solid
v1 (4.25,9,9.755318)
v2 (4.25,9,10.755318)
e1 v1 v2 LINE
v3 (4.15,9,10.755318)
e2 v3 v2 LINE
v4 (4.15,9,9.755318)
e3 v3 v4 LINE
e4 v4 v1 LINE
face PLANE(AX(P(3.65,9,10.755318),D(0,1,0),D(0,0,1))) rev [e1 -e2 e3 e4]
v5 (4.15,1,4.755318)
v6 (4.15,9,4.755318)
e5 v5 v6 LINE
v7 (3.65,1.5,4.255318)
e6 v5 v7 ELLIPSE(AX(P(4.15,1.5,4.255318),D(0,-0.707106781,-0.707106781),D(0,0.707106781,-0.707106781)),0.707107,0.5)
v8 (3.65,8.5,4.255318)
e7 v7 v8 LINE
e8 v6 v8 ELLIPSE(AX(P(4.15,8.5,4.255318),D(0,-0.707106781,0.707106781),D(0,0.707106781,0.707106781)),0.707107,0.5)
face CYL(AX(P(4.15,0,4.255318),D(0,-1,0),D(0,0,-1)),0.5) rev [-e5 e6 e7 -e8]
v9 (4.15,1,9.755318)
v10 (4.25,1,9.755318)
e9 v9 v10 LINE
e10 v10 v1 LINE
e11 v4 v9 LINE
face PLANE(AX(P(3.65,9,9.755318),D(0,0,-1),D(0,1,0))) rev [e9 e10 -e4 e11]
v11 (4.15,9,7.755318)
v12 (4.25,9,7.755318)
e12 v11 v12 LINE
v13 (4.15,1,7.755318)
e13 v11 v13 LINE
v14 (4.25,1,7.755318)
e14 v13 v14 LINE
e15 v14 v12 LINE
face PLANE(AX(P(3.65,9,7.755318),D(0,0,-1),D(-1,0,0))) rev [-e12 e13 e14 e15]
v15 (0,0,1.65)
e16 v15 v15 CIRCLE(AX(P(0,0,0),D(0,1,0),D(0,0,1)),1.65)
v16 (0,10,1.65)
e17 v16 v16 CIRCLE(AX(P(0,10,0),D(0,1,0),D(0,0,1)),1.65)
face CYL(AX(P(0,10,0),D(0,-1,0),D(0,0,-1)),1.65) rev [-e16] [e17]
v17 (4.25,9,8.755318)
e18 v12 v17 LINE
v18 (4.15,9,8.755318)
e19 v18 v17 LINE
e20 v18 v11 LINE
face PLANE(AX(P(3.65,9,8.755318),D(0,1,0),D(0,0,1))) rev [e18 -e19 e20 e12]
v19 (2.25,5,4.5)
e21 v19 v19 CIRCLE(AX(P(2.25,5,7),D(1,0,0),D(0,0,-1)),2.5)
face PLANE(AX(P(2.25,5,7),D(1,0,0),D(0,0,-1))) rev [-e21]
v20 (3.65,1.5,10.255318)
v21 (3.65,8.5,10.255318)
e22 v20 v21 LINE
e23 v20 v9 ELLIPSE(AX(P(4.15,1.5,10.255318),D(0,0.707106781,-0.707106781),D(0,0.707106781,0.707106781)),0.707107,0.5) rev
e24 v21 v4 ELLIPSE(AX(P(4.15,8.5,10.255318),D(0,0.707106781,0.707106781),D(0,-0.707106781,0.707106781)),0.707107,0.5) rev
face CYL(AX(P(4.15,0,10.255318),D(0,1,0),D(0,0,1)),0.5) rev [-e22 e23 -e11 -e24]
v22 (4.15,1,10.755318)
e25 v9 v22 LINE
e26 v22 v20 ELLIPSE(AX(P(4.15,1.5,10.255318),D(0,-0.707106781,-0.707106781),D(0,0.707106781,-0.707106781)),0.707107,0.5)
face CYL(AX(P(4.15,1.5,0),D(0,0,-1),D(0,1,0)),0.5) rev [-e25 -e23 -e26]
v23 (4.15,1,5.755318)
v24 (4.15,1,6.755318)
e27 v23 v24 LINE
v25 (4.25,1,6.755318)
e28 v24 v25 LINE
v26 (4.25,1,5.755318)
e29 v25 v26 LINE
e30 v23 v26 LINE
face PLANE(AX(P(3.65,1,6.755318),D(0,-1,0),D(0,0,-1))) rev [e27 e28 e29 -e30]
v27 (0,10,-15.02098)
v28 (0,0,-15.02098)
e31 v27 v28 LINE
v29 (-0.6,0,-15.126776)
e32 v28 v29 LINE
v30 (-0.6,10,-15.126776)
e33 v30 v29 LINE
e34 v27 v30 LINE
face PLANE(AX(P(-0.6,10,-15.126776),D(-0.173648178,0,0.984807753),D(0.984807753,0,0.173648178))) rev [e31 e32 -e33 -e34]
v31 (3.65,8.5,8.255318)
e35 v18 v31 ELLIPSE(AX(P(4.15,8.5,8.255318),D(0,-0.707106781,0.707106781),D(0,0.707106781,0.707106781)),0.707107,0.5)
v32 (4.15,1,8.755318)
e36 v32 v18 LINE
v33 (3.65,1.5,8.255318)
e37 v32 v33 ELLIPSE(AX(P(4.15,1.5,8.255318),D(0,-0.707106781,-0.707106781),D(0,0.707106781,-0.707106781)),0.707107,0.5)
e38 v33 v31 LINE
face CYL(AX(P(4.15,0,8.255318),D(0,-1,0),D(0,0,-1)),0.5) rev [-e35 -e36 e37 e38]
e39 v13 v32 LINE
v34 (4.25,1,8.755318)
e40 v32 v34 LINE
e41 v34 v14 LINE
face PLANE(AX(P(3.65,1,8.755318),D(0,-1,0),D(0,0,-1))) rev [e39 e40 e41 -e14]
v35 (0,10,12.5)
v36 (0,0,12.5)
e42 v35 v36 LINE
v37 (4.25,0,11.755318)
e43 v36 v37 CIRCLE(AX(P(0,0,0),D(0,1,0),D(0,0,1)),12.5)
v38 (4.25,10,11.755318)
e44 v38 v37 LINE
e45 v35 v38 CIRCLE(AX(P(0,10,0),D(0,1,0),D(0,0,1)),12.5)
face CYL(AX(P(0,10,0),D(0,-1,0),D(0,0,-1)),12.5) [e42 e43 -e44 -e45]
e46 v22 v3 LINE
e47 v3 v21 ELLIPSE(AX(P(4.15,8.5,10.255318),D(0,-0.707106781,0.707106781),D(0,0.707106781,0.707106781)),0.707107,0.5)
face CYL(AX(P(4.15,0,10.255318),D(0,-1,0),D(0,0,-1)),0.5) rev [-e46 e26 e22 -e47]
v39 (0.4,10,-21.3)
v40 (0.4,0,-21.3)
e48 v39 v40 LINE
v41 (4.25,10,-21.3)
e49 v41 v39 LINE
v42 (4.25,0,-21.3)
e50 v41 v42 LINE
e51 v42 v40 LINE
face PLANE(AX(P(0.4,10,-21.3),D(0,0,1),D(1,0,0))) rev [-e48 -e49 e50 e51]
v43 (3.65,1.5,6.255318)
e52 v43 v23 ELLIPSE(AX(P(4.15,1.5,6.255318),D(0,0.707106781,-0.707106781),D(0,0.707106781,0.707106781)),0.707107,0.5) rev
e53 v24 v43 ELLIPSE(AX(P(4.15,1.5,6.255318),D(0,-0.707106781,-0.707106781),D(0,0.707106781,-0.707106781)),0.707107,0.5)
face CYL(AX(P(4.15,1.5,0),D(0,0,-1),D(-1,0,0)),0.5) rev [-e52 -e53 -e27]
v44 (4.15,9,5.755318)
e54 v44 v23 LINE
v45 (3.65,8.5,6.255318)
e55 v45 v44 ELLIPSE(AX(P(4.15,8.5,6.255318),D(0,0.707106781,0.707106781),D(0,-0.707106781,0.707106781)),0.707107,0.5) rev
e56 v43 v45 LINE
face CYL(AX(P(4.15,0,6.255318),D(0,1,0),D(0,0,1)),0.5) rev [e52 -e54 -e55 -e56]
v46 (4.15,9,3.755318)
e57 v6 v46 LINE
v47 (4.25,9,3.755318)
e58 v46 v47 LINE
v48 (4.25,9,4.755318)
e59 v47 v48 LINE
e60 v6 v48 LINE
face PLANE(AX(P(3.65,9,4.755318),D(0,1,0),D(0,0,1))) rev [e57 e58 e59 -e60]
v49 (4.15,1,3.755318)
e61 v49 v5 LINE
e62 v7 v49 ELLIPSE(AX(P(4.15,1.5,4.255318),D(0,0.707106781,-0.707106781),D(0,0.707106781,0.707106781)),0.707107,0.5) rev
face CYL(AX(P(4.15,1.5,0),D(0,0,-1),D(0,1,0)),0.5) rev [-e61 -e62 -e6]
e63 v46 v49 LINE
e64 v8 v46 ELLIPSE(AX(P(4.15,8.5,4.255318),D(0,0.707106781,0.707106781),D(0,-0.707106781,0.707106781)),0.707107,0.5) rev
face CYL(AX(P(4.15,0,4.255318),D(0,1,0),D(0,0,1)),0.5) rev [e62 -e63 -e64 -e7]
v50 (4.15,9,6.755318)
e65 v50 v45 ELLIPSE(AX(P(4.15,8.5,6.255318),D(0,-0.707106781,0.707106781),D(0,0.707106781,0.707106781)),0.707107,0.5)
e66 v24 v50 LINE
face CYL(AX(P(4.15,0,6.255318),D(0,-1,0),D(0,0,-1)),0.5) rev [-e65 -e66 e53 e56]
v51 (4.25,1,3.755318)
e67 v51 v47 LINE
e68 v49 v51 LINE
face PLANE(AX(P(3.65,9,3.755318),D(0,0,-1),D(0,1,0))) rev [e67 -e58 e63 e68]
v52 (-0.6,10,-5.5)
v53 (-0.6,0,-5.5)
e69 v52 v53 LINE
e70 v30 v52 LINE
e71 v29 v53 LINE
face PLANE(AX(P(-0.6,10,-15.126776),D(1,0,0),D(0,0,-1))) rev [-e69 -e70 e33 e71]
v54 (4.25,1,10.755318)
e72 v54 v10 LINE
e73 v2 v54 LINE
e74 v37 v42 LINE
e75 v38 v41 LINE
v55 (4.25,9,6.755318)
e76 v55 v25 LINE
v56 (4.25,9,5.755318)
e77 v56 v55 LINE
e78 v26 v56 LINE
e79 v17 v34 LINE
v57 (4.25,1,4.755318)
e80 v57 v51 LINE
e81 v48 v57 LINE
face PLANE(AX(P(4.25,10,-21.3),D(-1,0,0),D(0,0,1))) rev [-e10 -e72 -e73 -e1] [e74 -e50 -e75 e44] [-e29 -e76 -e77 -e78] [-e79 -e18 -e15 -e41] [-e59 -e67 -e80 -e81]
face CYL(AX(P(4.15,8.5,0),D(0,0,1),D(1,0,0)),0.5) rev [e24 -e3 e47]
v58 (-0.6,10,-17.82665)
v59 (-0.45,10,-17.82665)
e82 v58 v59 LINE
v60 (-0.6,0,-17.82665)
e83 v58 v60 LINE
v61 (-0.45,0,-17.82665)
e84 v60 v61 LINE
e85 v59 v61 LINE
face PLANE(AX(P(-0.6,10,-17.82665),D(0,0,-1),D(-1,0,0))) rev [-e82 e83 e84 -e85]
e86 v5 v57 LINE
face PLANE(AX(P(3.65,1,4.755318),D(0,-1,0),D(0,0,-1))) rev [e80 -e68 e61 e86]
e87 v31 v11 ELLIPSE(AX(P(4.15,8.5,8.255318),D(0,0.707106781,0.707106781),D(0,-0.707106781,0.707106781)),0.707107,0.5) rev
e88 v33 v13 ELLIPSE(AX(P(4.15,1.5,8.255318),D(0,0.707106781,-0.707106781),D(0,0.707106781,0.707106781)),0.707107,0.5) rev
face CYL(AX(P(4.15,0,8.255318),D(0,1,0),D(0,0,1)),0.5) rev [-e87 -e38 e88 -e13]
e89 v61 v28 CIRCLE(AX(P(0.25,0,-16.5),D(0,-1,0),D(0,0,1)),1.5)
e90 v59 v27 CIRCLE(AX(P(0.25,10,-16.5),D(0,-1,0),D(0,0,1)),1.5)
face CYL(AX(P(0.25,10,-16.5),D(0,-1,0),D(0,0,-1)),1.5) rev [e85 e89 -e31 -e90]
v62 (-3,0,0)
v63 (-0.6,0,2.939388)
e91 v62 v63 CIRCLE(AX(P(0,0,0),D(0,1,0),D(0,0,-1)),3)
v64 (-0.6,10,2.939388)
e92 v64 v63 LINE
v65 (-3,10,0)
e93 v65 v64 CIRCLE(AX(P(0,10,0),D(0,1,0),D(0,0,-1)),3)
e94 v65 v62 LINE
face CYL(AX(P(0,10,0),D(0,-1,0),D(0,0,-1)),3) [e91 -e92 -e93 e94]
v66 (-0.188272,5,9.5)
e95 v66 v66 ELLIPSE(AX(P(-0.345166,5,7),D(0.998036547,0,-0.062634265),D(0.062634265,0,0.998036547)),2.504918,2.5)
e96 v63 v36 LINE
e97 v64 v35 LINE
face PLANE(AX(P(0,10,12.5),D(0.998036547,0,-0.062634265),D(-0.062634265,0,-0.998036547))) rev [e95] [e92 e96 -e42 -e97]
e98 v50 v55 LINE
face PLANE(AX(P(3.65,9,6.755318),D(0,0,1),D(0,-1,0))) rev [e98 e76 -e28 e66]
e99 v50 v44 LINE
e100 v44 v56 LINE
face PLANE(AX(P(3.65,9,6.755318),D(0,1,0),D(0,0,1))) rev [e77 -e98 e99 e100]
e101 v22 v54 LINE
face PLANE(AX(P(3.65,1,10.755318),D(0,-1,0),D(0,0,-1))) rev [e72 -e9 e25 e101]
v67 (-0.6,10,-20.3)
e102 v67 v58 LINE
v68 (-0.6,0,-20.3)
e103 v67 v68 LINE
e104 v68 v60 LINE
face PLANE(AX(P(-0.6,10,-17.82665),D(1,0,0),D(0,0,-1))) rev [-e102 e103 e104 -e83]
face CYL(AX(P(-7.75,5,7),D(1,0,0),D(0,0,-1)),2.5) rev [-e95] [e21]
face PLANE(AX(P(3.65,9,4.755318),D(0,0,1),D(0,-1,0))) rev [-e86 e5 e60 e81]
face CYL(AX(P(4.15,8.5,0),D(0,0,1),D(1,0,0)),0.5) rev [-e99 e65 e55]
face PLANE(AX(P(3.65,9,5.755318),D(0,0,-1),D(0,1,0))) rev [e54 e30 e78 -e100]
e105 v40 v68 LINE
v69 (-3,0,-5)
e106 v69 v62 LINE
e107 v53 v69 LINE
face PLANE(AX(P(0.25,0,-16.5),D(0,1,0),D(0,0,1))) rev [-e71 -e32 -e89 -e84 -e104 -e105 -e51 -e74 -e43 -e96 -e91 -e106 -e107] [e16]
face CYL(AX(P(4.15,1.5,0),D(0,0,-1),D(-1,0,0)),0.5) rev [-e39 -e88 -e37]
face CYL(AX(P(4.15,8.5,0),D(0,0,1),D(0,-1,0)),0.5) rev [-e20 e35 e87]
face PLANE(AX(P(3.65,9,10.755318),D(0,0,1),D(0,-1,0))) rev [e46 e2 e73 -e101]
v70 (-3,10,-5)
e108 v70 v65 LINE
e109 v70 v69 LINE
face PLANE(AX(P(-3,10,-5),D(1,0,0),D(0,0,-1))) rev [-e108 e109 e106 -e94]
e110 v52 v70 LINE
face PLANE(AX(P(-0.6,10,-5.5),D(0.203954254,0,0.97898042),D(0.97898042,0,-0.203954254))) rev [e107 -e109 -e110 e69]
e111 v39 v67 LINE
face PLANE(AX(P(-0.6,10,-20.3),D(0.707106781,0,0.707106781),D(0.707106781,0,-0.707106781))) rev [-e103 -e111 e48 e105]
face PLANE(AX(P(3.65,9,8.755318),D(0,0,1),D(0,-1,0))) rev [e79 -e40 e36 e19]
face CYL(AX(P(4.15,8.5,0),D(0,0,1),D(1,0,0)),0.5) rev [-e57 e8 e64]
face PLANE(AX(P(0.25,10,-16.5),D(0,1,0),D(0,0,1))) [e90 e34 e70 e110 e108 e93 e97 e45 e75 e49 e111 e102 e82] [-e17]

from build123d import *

# Parameters (mm, degrees)
SKETCH1_R           = 1.65
BOSS_EXTRUDE1_DEPTH = 10
CUT_EXTRUDE1_START  = -2
SKETCH2_R           = 2.5
CUT_EXTRUDE1_DEPTH  = 10
SKETCH3_W           = 1
SKETCH3_H           = 8
CUT_EXTRUDE2_DEPTH  = 0.6
FILLET1_R           = 0.5


with BuildPart() as part:
    # Sketch1 → Boss-Extrude1 (new body)
    with BuildSketch(Plane(origin=(0, 0, 0), x_dir=(1, 0, 0), z_dir=(0, 1, 0))):
        with BuildLine():
            Line((4.25, 21.3), (4.25, -11.755317946))
            ThreePointArc((4.25, -11.755317946), (2.157374061, -12.312422067), (0, -12.5))
            Line((0, -12.5), (-0.6, -2.939387691))
            ThreePointArc((-0.6, -2.939387691), (-2.323790008, -1.897366596), (-3, 0))
            Line((-3, 0), (-3, 5))
            Line((-3, 5), (-0.6, 5.5))
            Line((-0.6, 5.5), (-0.6, 15.126776243))
            Line((-0.6, 15.126776243), (0, 15.020980054))
            ThreePointArc((0, 15.020980054), (1.731070844, 16.737548219), (-0.45, 17.826649916))
            Line((-0.45, 17.826649916), (-0.6, 17.826649916))
            Line((-0.6, 17.826649916), (-0.6, 20.3))
            Line((-0.6, 20.3), (0.4, 21.3))
            Line((0.4, 21.3), (4.25, 21.3))
        make_face()
        with Locations(Location((0, 0, 0), (0, 0, 270))):
            Circle(SKETCH1_R, mode=Mode.SUBTRACT)
    extrude(amount=BOSS_EXTRUDE1_DEPTH)

    # Sketch2 → Cut-Extrude1 (cut)
    with BuildSketch(Plane(origin=(4.25, 0, 0), x_dir=(0, 0, -1), z_dir=(1, 0, 0)).offset(CUT_EXTRUDE1_START)):
        with Locations((-7, 5)):
            Circle(SKETCH2_R)
    extrude(amount=-CUT_EXTRUDE1_DEPTH, mode=Mode.SUBTRACT)

    # Sketch3 → Cut-Extrude2 (cut)
    with BuildSketch(Plane(origin=(4.25, 0, 0), x_dir=(0, 0, -1), z_dir=(1, 0, 0))):
        with Locations((-10.255317946, 5)):
            Rectangle(SKETCH3_W, SKETCH3_H)
        with Locations((-8.255317946, 5)):
            Rectangle(SKETCH3_W, SKETCH3_H)
        with Locations((-6.255317946, 5)):
            Rectangle(SKETCH3_W, SKETCH3_H)
        with Locations((-4.255317946, 5)):
            Rectangle(SKETCH3_W, SKETCH3_H)
    extrude(amount=-CUT_EXTRUDE2_DEPTH, mode=Mode.SUBTRACT)

    # Fillet1
    fillet1_edges = [part.edges().sort_by_distance(p)[0] for p in [
        (3.65, 5, 10.755317946),
        (3.65, 9, 10.255317946),
        (3.65, 5, 9.755317946),
        (3.65, 1, 10.255317946),
        (3.65, 5, 8.755317946),
        (3.65, 9, 8.255317946),
        (3.65, 5, 7.755317946),
        (3.65, 1, 8.255317946),
        (3.65, 5, 6.755317946),
        (3.65, 9, 6.255317946),
        (3.65, 5, 5.755317946),
        (3.65, 1, 6.255317946),
        (3.65, 5, 4.755317946),
        (3.65, 9, 4.255317946),
        (3.65, 5, 3.755317946),
        (3.65, 1, 4.255317946),
    ]]
    fillet(fillet1_edges, radius=FILLET1_R - 0.0001)  # a hair under: the kernel refuses the full size


solid = part.part
